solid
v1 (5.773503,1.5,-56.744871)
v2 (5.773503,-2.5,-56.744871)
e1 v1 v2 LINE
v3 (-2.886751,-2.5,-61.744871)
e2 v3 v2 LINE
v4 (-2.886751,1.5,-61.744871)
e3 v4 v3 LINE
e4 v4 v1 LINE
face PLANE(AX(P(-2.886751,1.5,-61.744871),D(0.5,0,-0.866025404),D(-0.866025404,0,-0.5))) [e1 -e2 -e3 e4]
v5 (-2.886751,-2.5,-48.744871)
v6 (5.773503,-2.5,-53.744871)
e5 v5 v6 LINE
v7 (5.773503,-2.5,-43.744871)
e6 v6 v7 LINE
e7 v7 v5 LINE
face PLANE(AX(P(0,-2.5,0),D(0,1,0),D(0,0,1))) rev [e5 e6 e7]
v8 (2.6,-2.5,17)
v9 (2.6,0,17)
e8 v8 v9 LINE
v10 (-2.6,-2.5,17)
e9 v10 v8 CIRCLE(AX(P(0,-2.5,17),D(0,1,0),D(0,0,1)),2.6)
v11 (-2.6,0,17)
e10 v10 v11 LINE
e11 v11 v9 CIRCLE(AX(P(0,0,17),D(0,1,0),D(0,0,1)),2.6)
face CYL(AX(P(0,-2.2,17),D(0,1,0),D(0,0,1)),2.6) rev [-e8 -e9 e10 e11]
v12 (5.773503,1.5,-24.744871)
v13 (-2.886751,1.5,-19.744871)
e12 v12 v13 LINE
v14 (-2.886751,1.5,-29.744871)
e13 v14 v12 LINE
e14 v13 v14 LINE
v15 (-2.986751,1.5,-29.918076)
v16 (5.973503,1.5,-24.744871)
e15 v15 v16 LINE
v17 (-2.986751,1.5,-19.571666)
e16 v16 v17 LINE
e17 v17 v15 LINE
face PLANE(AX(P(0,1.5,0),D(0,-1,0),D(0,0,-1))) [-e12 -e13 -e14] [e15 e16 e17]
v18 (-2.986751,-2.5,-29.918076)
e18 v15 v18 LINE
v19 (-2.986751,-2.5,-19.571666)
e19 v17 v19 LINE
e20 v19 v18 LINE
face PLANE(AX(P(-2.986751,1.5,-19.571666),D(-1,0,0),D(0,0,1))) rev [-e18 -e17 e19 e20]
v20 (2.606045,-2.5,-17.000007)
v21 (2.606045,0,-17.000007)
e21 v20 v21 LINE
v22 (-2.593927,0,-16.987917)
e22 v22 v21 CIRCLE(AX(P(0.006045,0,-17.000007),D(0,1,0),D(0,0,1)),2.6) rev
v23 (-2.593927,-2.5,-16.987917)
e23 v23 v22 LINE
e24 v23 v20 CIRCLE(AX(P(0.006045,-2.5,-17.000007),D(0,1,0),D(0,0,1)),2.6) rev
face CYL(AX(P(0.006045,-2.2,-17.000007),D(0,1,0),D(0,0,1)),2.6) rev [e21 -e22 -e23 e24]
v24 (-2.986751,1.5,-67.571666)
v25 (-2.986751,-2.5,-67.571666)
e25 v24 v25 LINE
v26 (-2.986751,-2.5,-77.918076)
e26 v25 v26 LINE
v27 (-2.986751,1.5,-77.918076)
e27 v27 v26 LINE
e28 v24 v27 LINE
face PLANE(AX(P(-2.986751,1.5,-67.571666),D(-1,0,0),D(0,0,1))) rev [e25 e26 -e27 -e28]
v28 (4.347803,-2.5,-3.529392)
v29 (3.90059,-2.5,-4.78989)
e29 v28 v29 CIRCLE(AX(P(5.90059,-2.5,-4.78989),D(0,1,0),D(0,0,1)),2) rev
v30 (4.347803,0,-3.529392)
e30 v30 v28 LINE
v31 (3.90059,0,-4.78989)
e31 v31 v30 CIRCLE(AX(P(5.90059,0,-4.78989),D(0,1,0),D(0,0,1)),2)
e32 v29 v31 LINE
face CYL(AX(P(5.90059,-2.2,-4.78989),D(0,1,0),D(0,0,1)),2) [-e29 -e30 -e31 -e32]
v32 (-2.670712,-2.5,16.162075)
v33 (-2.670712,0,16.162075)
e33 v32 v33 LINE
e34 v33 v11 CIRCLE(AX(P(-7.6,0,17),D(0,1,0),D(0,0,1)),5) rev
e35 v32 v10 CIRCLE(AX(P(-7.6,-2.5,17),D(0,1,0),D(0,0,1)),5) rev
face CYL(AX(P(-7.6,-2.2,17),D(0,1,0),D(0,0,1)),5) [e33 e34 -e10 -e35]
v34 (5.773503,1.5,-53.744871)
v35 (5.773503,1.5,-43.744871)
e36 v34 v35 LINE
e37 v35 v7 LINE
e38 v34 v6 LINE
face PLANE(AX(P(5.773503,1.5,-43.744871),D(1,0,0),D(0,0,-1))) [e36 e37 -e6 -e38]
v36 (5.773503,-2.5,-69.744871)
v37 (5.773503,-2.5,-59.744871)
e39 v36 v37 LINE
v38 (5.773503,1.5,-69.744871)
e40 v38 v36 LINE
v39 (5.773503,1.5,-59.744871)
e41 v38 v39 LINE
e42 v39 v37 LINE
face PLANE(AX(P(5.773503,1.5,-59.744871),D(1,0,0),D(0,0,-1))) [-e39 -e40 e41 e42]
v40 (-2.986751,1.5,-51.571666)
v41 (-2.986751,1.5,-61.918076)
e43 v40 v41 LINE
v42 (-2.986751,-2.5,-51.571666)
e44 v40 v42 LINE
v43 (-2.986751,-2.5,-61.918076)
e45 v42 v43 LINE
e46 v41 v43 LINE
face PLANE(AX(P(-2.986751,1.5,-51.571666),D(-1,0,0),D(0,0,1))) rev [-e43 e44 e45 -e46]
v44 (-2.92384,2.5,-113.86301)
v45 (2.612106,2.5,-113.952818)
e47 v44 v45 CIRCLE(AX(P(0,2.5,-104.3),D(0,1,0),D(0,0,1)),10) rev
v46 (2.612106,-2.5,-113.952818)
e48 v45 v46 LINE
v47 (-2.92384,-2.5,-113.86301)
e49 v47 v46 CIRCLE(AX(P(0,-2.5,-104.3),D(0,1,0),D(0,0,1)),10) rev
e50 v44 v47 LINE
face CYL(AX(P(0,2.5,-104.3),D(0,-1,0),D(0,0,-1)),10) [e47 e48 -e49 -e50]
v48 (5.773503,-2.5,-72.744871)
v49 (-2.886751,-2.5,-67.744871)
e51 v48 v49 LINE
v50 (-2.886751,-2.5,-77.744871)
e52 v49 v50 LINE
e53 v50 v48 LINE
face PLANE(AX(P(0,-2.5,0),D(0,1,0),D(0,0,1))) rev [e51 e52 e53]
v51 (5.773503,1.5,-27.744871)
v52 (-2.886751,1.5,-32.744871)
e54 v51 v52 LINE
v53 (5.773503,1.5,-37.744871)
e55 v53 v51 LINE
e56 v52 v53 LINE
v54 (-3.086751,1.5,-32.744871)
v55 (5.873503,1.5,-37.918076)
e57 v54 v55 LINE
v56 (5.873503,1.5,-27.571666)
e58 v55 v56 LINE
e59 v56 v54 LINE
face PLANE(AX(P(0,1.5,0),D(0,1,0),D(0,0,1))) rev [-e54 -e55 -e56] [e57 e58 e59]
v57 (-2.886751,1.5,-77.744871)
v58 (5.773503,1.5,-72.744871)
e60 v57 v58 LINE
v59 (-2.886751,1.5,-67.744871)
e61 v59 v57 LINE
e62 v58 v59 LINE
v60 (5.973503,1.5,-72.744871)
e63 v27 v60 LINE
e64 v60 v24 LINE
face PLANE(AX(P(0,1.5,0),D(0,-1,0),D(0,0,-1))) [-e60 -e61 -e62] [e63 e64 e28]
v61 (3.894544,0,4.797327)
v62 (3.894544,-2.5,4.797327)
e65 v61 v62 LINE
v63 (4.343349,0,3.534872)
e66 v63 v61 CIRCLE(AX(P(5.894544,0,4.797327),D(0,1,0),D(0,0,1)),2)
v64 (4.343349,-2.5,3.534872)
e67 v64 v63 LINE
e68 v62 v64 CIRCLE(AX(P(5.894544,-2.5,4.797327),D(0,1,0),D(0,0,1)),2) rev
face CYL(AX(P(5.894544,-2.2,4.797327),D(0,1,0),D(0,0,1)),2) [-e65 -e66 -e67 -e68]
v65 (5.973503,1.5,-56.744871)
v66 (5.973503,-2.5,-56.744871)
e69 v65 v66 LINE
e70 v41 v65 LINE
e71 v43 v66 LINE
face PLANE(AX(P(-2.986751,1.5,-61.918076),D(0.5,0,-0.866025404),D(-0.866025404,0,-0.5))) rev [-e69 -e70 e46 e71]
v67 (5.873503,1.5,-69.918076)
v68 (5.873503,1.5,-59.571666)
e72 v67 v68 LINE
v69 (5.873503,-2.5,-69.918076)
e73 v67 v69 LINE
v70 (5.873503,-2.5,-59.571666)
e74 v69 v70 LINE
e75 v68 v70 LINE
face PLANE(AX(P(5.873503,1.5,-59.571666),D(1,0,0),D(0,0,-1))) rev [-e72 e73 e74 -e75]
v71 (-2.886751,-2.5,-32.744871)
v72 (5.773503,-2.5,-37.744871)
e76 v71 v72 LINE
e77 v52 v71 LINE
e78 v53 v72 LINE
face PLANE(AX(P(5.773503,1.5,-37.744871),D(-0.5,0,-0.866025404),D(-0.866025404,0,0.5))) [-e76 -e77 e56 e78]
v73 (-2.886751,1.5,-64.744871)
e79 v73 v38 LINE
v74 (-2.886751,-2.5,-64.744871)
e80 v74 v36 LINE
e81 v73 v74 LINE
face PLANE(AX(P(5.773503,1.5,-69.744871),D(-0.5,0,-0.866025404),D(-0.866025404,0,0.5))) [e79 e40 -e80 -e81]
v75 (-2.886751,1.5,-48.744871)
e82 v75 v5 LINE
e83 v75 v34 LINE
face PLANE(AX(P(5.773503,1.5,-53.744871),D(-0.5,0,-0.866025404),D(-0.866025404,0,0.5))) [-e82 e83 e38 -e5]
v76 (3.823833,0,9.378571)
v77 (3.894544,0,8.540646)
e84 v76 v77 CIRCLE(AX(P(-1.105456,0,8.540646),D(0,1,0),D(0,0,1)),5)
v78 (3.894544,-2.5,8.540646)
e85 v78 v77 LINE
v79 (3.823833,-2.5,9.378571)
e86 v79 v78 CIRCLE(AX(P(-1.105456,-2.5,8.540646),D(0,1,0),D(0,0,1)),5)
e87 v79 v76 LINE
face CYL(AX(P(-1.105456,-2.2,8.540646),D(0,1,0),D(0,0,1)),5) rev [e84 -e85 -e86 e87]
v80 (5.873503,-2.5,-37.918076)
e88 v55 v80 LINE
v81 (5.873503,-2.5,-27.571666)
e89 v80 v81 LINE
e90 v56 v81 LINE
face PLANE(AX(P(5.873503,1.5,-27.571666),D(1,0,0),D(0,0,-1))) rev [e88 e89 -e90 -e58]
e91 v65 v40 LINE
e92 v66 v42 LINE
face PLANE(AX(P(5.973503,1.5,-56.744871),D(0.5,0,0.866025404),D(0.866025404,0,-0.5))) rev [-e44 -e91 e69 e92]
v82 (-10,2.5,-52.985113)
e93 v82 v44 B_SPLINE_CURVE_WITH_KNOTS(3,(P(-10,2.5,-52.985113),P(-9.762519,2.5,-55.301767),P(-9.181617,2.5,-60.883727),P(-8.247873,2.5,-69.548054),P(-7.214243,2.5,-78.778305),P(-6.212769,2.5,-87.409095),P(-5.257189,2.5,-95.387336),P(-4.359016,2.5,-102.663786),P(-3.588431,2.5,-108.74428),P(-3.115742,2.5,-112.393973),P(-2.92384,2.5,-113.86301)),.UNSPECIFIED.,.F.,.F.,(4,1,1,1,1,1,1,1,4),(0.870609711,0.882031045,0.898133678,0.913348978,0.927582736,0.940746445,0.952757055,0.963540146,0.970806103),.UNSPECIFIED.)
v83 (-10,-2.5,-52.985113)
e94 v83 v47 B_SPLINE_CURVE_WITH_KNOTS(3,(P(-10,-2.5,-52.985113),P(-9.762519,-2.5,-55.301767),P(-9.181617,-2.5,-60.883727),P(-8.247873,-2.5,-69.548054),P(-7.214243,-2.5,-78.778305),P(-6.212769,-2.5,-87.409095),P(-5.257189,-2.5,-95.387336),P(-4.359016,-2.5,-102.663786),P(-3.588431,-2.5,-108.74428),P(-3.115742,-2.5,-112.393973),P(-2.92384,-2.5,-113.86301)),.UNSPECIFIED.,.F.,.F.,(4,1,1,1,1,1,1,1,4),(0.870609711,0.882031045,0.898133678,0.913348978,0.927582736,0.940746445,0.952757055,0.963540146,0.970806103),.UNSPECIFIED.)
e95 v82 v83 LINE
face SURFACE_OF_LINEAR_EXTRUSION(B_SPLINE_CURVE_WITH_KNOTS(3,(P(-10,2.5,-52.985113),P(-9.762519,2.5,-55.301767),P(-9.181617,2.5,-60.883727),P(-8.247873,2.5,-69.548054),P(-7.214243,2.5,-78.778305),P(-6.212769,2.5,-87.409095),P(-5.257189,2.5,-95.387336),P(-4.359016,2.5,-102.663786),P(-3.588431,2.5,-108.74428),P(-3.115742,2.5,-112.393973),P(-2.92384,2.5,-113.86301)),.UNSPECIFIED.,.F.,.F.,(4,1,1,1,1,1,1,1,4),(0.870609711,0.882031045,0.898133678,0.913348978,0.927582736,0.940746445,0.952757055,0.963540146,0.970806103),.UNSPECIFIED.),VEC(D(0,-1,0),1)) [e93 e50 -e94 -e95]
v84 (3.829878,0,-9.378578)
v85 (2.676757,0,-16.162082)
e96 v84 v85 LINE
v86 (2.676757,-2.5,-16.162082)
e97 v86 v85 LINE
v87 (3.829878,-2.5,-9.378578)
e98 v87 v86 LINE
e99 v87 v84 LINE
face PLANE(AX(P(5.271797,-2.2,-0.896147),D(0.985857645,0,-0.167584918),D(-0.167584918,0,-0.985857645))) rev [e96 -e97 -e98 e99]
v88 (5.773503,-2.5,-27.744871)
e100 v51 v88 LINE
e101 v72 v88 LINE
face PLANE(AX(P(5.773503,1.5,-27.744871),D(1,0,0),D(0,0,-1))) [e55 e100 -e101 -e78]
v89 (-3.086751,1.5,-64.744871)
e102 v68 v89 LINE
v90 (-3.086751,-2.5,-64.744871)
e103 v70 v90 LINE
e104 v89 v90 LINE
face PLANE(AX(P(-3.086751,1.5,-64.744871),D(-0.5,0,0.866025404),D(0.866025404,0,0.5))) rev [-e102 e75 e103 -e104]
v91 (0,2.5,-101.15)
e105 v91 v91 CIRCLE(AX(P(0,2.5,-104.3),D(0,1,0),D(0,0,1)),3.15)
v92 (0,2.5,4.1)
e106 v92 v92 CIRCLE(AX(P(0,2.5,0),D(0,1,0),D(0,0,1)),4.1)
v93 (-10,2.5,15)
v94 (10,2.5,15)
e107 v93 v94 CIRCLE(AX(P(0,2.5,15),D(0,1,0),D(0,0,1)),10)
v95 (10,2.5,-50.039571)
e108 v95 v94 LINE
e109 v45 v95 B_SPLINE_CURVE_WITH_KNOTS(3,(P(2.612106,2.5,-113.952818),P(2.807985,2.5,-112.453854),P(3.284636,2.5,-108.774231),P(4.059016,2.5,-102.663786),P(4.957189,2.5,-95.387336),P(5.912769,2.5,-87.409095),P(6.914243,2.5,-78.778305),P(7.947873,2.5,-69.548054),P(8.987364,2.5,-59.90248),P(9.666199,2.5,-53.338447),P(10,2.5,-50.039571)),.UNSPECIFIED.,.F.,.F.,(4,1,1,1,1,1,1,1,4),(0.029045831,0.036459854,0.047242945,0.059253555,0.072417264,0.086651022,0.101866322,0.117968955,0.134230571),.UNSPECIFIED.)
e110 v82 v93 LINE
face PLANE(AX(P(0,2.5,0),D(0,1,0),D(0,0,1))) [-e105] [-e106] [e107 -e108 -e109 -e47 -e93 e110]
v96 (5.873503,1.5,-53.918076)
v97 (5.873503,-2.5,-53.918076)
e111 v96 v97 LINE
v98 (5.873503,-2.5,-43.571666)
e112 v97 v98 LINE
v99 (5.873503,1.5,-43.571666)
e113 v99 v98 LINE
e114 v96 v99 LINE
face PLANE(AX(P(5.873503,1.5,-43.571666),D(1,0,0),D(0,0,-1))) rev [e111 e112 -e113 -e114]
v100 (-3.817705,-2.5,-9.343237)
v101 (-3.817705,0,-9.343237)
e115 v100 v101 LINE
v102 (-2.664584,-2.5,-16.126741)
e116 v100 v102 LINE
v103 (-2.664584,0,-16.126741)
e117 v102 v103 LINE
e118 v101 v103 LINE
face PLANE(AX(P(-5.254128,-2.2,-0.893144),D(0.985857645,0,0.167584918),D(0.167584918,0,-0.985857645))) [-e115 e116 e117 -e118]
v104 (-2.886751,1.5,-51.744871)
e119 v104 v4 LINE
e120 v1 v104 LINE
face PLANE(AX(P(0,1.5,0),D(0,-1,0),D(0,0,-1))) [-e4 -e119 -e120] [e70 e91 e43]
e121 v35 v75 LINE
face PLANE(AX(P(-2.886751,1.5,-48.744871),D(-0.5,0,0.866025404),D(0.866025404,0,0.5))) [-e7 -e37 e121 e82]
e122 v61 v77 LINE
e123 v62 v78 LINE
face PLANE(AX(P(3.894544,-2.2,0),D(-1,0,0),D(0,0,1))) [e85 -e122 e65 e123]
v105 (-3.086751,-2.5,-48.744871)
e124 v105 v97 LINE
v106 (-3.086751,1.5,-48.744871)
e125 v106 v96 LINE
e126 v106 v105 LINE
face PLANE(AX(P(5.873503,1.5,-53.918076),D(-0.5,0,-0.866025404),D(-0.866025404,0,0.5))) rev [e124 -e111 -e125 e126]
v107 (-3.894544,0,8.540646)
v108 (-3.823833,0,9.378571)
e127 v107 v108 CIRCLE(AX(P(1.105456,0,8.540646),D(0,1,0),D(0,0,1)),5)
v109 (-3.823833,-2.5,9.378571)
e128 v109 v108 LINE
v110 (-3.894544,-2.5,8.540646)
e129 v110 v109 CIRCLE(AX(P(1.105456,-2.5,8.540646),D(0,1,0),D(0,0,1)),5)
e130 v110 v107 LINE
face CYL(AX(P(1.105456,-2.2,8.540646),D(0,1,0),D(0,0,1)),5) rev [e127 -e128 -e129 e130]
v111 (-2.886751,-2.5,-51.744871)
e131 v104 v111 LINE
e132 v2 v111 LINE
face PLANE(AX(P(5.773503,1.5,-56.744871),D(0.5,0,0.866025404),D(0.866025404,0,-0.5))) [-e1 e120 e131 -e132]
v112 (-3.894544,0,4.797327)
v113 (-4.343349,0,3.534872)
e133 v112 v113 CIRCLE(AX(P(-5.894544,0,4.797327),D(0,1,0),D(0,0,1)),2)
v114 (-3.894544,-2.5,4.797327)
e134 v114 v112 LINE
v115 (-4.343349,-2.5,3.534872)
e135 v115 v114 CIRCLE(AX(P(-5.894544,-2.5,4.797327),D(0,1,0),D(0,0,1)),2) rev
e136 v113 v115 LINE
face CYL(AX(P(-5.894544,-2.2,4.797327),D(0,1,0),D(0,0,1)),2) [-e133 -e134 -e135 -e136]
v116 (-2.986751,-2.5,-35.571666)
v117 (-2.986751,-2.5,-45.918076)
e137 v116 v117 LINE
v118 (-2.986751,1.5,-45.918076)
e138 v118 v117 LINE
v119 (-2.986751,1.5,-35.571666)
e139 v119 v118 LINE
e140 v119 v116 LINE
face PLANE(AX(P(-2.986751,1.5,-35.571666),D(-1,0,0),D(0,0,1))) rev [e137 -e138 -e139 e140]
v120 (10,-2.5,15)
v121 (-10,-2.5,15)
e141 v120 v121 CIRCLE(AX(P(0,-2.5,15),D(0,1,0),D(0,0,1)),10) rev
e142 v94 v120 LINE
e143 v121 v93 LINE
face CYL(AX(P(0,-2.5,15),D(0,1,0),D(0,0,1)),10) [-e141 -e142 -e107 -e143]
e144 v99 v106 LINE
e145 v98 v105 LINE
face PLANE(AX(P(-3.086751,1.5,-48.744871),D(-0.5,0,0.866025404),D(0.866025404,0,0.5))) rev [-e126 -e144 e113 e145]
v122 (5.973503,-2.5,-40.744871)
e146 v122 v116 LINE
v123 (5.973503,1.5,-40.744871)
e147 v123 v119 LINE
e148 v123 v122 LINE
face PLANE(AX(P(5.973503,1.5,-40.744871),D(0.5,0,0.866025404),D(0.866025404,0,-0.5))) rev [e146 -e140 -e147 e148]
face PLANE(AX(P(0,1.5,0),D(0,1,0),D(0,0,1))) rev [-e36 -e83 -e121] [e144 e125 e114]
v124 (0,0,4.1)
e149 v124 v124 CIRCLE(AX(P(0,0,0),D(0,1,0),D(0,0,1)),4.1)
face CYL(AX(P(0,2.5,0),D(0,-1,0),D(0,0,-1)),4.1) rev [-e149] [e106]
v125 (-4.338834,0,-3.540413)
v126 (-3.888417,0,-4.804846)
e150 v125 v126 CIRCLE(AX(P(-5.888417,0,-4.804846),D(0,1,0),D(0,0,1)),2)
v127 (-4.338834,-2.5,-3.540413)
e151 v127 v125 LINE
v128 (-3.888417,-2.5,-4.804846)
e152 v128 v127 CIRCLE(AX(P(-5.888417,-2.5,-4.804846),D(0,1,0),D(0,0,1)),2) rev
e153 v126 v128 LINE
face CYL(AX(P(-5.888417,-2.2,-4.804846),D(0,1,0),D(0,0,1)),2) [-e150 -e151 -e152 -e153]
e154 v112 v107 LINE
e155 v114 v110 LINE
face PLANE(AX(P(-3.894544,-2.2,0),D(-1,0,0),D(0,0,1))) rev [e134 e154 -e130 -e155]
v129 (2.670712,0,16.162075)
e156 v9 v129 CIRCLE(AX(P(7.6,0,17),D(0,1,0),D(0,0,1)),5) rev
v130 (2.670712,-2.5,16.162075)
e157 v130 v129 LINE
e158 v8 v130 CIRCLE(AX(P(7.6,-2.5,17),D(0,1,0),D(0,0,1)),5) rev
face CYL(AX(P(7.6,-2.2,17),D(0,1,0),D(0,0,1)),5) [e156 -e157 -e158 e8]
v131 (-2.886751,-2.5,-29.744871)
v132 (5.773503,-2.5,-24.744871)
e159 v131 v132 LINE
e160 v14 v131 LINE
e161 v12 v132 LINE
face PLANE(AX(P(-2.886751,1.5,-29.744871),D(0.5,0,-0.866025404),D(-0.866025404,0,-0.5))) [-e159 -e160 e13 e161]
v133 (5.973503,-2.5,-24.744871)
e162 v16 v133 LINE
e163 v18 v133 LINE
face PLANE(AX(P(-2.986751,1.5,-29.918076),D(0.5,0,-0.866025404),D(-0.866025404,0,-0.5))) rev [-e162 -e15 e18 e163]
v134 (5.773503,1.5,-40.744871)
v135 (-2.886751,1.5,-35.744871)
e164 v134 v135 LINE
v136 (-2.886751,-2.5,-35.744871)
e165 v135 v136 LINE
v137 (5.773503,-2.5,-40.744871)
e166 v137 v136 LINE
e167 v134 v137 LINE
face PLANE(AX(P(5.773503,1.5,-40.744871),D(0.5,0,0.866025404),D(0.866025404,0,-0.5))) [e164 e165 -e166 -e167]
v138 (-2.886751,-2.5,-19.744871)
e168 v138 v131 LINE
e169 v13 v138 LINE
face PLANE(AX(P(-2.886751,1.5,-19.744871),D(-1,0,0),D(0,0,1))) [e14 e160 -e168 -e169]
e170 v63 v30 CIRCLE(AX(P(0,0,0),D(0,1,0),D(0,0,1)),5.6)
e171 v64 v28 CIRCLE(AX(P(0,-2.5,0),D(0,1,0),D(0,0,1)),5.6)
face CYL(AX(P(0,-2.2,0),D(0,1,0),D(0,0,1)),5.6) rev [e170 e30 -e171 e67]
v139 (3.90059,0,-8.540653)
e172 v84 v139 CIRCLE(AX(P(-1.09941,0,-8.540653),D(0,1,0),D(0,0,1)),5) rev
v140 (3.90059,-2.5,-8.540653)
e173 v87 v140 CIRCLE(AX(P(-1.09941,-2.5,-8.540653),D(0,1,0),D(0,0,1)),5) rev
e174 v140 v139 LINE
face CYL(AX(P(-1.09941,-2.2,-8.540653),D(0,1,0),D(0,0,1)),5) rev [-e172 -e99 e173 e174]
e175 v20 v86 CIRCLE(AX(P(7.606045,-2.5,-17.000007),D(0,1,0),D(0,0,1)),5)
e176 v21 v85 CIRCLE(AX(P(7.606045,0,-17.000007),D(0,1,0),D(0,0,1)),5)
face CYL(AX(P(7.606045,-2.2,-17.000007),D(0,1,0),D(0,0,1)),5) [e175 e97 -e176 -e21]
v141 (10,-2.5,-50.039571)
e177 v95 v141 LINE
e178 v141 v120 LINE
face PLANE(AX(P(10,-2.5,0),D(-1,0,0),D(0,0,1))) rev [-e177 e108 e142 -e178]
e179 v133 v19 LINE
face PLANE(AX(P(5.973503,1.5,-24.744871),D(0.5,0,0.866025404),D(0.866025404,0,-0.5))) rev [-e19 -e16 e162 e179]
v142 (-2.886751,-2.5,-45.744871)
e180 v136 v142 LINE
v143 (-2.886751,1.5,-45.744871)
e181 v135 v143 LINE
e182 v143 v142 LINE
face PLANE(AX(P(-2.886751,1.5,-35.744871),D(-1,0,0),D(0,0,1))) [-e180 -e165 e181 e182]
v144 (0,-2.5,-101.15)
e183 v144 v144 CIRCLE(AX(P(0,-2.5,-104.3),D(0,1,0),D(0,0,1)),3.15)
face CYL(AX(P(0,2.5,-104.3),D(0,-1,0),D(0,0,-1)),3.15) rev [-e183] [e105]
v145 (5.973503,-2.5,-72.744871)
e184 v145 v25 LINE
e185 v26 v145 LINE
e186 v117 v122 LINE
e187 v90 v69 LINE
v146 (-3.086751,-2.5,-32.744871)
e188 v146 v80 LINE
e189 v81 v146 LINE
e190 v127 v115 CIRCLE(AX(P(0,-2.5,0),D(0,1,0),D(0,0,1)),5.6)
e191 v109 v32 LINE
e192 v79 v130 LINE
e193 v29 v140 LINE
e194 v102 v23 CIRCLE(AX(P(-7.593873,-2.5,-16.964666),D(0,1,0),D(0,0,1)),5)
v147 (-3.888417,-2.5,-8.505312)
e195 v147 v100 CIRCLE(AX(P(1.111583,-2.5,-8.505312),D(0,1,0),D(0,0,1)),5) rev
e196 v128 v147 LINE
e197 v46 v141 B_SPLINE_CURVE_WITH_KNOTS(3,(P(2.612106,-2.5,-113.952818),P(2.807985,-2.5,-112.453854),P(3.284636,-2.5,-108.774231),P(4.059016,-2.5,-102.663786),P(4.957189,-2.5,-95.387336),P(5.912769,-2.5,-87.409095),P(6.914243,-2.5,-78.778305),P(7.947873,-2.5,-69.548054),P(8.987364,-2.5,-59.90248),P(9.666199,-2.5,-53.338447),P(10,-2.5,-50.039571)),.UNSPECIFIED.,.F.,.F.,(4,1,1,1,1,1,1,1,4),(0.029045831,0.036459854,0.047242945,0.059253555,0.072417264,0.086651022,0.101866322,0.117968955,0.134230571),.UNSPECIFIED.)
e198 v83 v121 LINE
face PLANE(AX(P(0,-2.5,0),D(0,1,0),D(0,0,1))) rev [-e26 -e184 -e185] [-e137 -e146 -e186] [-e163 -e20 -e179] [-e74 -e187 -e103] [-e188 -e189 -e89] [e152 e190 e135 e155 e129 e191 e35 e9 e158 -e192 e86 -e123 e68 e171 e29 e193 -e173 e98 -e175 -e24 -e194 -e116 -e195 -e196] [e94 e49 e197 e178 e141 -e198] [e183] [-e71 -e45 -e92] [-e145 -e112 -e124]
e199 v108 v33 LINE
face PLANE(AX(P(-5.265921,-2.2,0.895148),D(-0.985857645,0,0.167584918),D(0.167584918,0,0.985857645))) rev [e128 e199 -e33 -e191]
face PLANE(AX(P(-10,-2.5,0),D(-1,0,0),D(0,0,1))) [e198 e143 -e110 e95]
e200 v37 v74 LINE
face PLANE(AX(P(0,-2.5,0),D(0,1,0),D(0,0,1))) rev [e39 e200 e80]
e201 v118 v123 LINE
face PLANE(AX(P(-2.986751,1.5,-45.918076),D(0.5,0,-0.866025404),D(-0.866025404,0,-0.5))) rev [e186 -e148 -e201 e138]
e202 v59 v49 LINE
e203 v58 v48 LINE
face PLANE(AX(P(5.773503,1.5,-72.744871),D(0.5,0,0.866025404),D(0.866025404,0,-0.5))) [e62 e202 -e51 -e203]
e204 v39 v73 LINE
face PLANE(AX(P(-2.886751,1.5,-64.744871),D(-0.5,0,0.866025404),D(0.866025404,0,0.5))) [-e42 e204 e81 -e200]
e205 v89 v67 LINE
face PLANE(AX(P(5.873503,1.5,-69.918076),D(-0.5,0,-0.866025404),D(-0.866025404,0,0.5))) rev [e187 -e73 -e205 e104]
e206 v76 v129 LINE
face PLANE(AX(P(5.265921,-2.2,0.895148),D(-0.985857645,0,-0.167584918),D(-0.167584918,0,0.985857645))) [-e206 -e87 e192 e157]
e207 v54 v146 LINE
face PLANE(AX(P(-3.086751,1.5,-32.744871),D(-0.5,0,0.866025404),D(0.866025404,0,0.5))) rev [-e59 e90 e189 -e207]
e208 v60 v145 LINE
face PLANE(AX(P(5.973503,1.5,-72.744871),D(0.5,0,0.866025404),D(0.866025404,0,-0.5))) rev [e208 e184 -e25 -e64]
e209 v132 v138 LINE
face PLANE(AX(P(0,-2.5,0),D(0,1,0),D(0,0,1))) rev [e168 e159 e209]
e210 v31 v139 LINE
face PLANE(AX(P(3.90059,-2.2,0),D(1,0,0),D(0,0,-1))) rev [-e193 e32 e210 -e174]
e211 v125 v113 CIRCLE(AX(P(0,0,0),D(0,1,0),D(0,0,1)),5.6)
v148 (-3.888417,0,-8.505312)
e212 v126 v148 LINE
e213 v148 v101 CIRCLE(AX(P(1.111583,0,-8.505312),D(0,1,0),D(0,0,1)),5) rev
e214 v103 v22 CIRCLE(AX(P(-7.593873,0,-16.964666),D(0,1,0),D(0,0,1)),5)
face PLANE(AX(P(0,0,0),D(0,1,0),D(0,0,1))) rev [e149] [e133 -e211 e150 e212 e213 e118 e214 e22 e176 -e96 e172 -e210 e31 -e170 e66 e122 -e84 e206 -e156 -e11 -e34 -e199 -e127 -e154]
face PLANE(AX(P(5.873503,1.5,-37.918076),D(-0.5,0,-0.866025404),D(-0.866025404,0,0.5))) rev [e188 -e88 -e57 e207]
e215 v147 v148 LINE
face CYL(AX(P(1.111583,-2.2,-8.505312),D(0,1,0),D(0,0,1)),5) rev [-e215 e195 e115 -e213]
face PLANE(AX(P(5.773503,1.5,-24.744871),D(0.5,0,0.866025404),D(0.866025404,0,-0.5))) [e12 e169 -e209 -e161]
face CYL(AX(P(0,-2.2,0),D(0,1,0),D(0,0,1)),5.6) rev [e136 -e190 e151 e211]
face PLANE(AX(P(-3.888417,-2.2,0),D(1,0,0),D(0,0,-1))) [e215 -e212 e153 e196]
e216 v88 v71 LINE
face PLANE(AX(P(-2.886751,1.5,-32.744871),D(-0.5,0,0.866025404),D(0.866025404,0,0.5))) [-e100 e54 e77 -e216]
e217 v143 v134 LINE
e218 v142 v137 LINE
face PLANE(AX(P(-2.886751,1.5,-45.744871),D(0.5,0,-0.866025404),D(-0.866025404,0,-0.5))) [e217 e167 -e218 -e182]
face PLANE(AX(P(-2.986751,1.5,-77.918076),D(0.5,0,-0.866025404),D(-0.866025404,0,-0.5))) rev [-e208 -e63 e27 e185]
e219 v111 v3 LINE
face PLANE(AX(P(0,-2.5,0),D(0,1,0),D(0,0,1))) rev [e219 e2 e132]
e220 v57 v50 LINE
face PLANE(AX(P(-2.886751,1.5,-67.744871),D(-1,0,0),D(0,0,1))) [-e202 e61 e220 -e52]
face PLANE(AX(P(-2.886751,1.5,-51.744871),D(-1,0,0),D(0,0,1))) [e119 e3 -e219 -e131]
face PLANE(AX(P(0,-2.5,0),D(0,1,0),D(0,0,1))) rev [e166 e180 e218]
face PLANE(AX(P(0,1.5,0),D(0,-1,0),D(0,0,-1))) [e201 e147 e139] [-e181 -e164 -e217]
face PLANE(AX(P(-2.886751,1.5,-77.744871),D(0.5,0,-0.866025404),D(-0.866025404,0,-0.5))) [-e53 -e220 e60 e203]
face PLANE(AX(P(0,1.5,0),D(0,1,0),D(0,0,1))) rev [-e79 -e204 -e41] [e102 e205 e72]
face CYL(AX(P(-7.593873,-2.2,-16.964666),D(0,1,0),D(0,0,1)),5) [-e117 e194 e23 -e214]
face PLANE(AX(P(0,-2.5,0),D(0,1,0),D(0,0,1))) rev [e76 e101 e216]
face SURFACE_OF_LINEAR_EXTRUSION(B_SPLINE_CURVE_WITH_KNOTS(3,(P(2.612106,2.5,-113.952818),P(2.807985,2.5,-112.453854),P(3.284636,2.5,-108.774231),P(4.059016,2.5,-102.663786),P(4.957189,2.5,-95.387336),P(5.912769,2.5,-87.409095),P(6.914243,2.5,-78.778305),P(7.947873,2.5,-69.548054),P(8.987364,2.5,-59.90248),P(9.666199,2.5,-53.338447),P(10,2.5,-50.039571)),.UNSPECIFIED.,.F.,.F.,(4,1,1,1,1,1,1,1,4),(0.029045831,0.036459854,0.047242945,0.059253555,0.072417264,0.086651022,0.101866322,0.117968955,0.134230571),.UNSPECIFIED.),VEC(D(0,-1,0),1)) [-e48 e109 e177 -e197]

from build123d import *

# Parameters (mm, degrees)
SKETCH1_W           = 15
SKETCH1_H           = 45
BOSS_EXTRUDE1_DEPTH = 2.2
SKETCH1_3_W         = 20
SKETCH1_3_H         = 50
SKETCH1_3_W_2       = 15
SKETCH1_3_H_2       = 45
BOSS_EXTRUDE2_DEPTH = 2.5
SKETCH1_4_W         = 20
SKETCH1_4_H         = 50
SKETCH1_4_R         = 4.1
BOSS_EXTRUDE3_DEPTH = 2.5
FILLET1_R           = 2
SKETCH1_5_R         = 3.15
BOSS_EXTRUDE4_DEPTH = 2.5
FILLET2_R           = 10
SKETCH2_R           = 3.15
CUT_EXTRUDE1_DEPTH  = 4
SKETCH3_OUTSIDE_W   = 50.164
SKETCH3_OUTSIDE_H   = 169.464
CUT_EXTRUDE2_DEPTH  = 115.845504919


with BuildPart() as part:
    # Sketch1 → Boss-Extrude1 (new body)
    with BuildSketch(Plane(origin=(0, 0, 0), x_dir=(1, 0, 0), z_dir=(0, 1, 0))):
        Rectangle(SKETCH1_W, SKETCH1_H)
        with BuildLine():
            ThreePointArc((-3.894544437, -4.023993492), (-5.599998379, 0.004260474), (-3.88841703, 4.029914763))
            Line((-3.88841703, 4.029914763), (-3.88841703, 8.505312122))
            ThreePointArc((-3.88841703, 8.505312122), (-3.870707724, 8.925763598), (-3.817705253, 9.343236712))
            Line((-3.817705253, 9.343236712), (-2.664584371, 16.126741161))
            ThreePointArc((-2.664584371, 16.126741161), (-2.610617779, 16.555799687), (-2.593926654, 16.987916591))
            ThreePointArc((-2.593926654, 16.987916591), (0, 19.6), (2.606045235, 17.000007028))
            ThreePointArc((2.606045235, 17.000007028), (2.623754541, 16.579555552), (2.676757012, 16.162082438))
            Line((2.676757012, 16.162082438), (3.829877895, 9.378577989))
            ThreePointArc((3.829877895, 9.378577989), (3.882880366, 8.961104875), (3.900589672, 8.540653399))
            Line((3.900589672, 8.540653399), (3.900589672, 4.018133922))
            ThreePointArc((3.900589672, 4.018133922), (5.157678846, 2.181364004), (5.6, 0))
            ThreePointArc((5.6, 0), (5.156037667, -2.185240393), (3.894544437, -4.023993492))
            Line((3.894544437, -4.023993492), (3.894544437, -8.540646372))
            ThreePointArc((3.894544437, -8.540646372), (3.876835131, -8.961097847), (3.82383266, -9.378570962))
            Line((3.82383266, -9.378570962), (2.670711777, -16.16207541))
            ThreePointArc((2.670711777, -16.16207541), (2.617709306, -16.579548524), (2.6, -17))
            ThreePointArc((2.6, -17), (0, -19.6), (-2.6, -17))
            ThreePointArc((-2.6, -17), (-2.617709306, -16.579548524), (-2.670711777, -16.16207541))
            Line((-2.670711777, -16.16207541), (-3.82383266, -9.378570962))
            ThreePointArc((-3.82383266, -9.378570962), (-3.876835131, -8.961097847), (-3.894544437, -8.540646372))
            Line((-3.894544437, -8.540646372), (-3.894544437, -4.023993492))
        make_face(mode=Mode.SUBTRACT)
    extrude(amount=-BOSS_EXTRUDE1_DEPTH)

    # Sketch1<3> → Boss-Extrude2 (add)
    # profile 1 of 2: a face of its own
    with BuildSketch(Plane(origin=(0, 0, 0), x_dir=(1, 0, 0), z_dir=(0, 1, 0))):
        Rectangle(SKETCH1_3_W, SKETCH1_3_H)
        Rectangle(SKETCH1_3_W_2, SKETCH1_3_H_2, mode=Mode.SUBTRACT)
    # profile 2 of 2: a face of its own
    with BuildSketch(Plane(origin=(0, 0, 0), x_dir=(1, 0, 0), z_dir=(0, 1, 0))):
        Rectangle(SKETCH1_3_W_2, SKETCH1_3_H_2)
        with BuildLine():
            ThreePointArc((-3.894544437, -4.023993492), (-5.599998379, 0.004260474), (-3.88841703, 4.029914763))
            Line((-3.88841703, 4.029914763), (-3.88841703, 8.505312122))
            ThreePointArc((-3.88841703, 8.505312122), (-3.870707724, 8.925763598), (-3.817705253, 9.343236712))
            Line((-3.817705253, 9.343236712), (-2.664584371, 16.126741161))
            ThreePointArc((-2.664584371, 16.126741161), (-2.610617779, 16.555799687), (-2.593926654, 16.987916591))
            ThreePointArc((-2.593926654, 16.987916591), (0, 19.6), (2.606045235, 17.000007028))
            ThreePointArc((2.606045235, 17.000007028), (2.623754541, 16.579555552), (2.676757012, 16.162082438))
            Line((2.676757012, 16.162082438), (3.829877895, 9.378577989))
            ThreePointArc((3.829877895, 9.378577989), (3.882880366, 8.961104875), (3.900589672, 8.540653399))
            Line((3.900589672, 8.540653399), (3.900589672, 4.018133922))
            ThreePointArc((3.900589672, 4.018133922), (5.157678846, 2.181364004), (5.6, 0))
            ThreePointArc((5.6, 0), (5.156037667, -2.185240393), (3.894544437, -4.023993492))
            Line((3.894544437, -4.023993492), (3.894544437, -8.540646372))
            ThreePointArc((3.894544437, -8.540646372), (3.876835131, -8.961097847), (3.82383266, -9.378570962))
            Line((3.82383266, -9.378570962), (2.670711777, -16.16207541))
            ThreePointArc((2.670711777, -16.16207541), (2.617709306, -16.579548524), (2.6, -17))
            ThreePointArc((2.6, -17), (0, -19.6), (-2.6, -17))
            ThreePointArc((-2.6, -17), (-2.617709306, -16.579548524), (-2.670711777, -16.16207541))
            Line((-2.670711777, -16.16207541), (-3.82383266, -9.378570962))
            ThreePointArc((-3.82383266, -9.378570962), (-3.876835131, -8.961097847), (-3.894544437, -8.540646372))
            Line((-3.894544437, -8.540646372), (-3.894544437, -4.023993492))
        make_face(mode=Mode.SUBTRACT)
    extrude(amount=-BOSS_EXTRUDE2_DEPTH)

    # Sketch1<4> → Boss-Extrude3 (add)
    with BuildSketch(Plane(origin=(0, 0, 0), x_dir=(1, 0, 0), z_dir=(0, 1, 0))):
        Rectangle(SKETCH1_4_W, SKETCH1_4_H)
        with Locations(Location((0, 0, 0), (0, 0, 270))):
            Circle(SKETCH1_4_R, mode=Mode.SUBTRACT)
    extrude(amount=BOSS_EXTRUDE3_DEPTH)

    # Fillet1
    fillet1_edges = [part.edges().sort_by_distance(p)[0] for p in [
        (-3.88841703, -1.25, -4.029914763),
        (-3.894544437, -1.25, 4.023993492),
        (3.894544437, -1.25, 4.023993492),
        (3.900589672, -1.25, -4.018133922),
    ]]
    fillet(fillet1_edges, radius=FILLET1_R)

    # Sketch1<5> → Boss-Extrude4 (add, symmetric)
    with BuildSketch(Plane(origin=(0, 0, 0), x_dir=(1, 0, 0), z_dir=(0, 1, 0))):
        with BuildLine():
            ThreePointArc((-10, 104.3), (0, 114.3), (10, 104.3))
            Line((10, 104.3), (10, 25))
            Line((10, 25), (-10, 25))
            Line((-10, 25), (-10, 104.3))
        make_face()
        with Locations(Location((0, 104.3, 0), (0, 0, 270))):
            Circle(SKETCH1_5_R, mode=Mode.SUBTRACT)
    extrude(amount=BOSS_EXTRUDE4_DEPTH, both=True)

    # Fillet2
    fillet2_edges = [part.edges().sort_by_distance(p)[0] for p in [
        (10, 0, 25),
        (-10, 0, 25),
    ]]
    fillet(fillet2_edges, radius=FILLET2_R - 0.0001)  # a hair under: the kernel refuses the full size

    # Sketch2 → Cut-Extrude1 (cut)
    # profile 1 of 8: a face of its own
    with BuildSketch(Plane.XZ.offset(2.5)):
        with Locations(Location((0, -104.3, 0), (0, 0, 90))):
            Circle(SKETCH2_R)
    # profile 2 of 8: a face of its own
    with BuildSketch(Plane.XZ.offset(2.5)):
        Polygon((5.973502692, -72.744870683), (-2.986751346, -67.571665602), (-2.986751346, -77.918075763), align=None)
        Polygon((5.773502692, -72.744870683), (-2.886751346, -67.744870683), (-2.886751346, -77.744870683), align=None, mode=Mode.SUBTRACT)
    # profile 3 of 8: a face of its own
    with BuildSketch(Plane.XZ.offset(2.5)):
        Polygon((5.973502692, -56.744870683), (-2.986751346, -51.571665602), (-2.986751346, -61.918075763), align=None)
        Polygon((5.773502692, -56.744870683), (-2.886751346, -51.744870683), (-2.886751346, -61.744870683), align=None, mode=Mode.SUBTRACT)
    # profile 4 of 8: a face of its own
    with BuildSketch(Plane.XZ.offset(2.5)):
        Polygon((5.973502692, -40.744870683), (-2.986751346, -35.571665602), (-2.986751346, -45.918075763), align=None)
        Polygon((5.773502692, -40.744870683), (-2.886751346, -35.744870683), (-2.886751346, -45.744870683), align=None, mode=Mode.SUBTRACT)
    # profile 5 of 8: a face of its own
    with BuildSketch(Plane.XZ.offset(2.5)):
        Polygon((5.973502692, -24.744870683), (-2.986751346, -19.571665602), (-2.986751346, -29.918075763), align=None)
        Polygon((5.773502692, -24.744870683), (-2.886751346, -19.744870683), (-2.886751346, -29.744870683), align=None, mode=Mode.SUBTRACT)
    # profile 6 of 8: a face of its own
    with BuildSketch(Plane.XZ.offset(2.5)):
        Polygon((-3.086751346, -64.744870683), (5.873502692, -59.571665602), (5.873502692, -69.918075763), align=None)
        Polygon((5.773502692, -69.744870683), (-2.886751346, -64.744870683), (5.773502692, -59.744870683), align=None, mode=Mode.SUBTRACT)
    # profile 7 of 8: a face of its own
    with BuildSketch(Plane.XZ.offset(2.5)):
        Polygon((-3.086751346, -48.744870683), (5.873502692, -43.571665602), (5.873502692, -53.918075763), align=None)
        Polygon((5.773502692, -53.744870683), (-2.886751346, -48.744870683), (5.773502692, -43.744870683), align=None, mode=Mode.SUBTRACT)
    # profile 8 of 8: a face of its own
    with BuildSketch(Plane.XZ.offset(2.5)):
        Polygon((-3.086751346, -32.744870683), (5.873502692, -27.571665602), (5.873502692, -37.918075763), align=None)
        Polygon((5.773502692, -37.744870683), (-2.886751346, -32.744870683), (5.773502692, -27.744870683), align=None, mode=Mode.SUBTRACT)
    extrude(amount=-CUT_EXTRUDE1_DEPTH, mode=Mode.SUBTRACT)

    # Sketch3 outside → Cut-Extrude2 (cut, through all)
    with BuildSketch(Plane.XZ.offset(2.5)):
        with Locations((0, -44.65)):
            Rectangle(SKETCH3_OUTSIDE_W, SKETCH3_OUTSIDE_H)
        with BuildLine():
            Line((10, -50.039570793), (10, 15))
            ThreePointArc((10, 15), (7.071067812, 22.071067812), (0, 25))
            ThreePointArc((0, 25), (-7.071067812, 22.071067812), (-10, 15))
            Line((-10, 15), (-10, -52.98511299))
            add(Edge.make_bspline(
                [(-10, -52.98511299), (-9.762519387, -55.301766927), (-9.181616668, -60.883726896), (-8.247873188, -69.548054482), (-7.214243072, -78.778305336), (-6.212768932, -87.409094774), (-5.257188729, -95.387335619), (-4.359016041, -102.663786405), (-3.588431315, -108.744280233), (-3.115741639, -112.393973299), (-2.923840172, -113.863009916)],
                knots=[0.870609711, 0.870609711, 0.870609711, 0.870609711, 0.882031045, 0.898133678, 0.913348978, 0.927582736, 0.940746445, 0.952757055, 0.963540146, 0.970806103, 0.970806103, 0.970806103, 0.970806103], degree=3))
            ThreePointArc((-2.923840172, -113.863009916), (-0.162206263, -114.29868437), (2.612106393, -113.952818251))
            add(Edge.make_bspline(
                [(2.612106393, -113.952818251), (2.807985487, -112.453854191), (3.284635603, -108.774231255), (4.059016041, -102.663786405), (4.957188729, -95.387335619), (5.912768932, -87.409094774), (6.914243072, -78.778305336), (7.947873188, -69.548054482), (8.987364419, -59.902479724), (9.66619931, -53.338446984), (10, -50.039570793)],
                knots=[0.029045831, 0.029045831, 0.029045831, 0.029045831, 0.036459854, 0.047242945, 0.059253555, 0.072417264, 0.086651022, 0.101866322, 0.117968955, 0.134230571, 0.134230571, 0.134230571, 0.134230571], degree=3))
        make_face(mode=Mode.SUBTRACT)
    extrude(amount=-CUT_EXTRUDE2_DEPTH, mode=Mode.SUBTRACT)


solid = part.part
